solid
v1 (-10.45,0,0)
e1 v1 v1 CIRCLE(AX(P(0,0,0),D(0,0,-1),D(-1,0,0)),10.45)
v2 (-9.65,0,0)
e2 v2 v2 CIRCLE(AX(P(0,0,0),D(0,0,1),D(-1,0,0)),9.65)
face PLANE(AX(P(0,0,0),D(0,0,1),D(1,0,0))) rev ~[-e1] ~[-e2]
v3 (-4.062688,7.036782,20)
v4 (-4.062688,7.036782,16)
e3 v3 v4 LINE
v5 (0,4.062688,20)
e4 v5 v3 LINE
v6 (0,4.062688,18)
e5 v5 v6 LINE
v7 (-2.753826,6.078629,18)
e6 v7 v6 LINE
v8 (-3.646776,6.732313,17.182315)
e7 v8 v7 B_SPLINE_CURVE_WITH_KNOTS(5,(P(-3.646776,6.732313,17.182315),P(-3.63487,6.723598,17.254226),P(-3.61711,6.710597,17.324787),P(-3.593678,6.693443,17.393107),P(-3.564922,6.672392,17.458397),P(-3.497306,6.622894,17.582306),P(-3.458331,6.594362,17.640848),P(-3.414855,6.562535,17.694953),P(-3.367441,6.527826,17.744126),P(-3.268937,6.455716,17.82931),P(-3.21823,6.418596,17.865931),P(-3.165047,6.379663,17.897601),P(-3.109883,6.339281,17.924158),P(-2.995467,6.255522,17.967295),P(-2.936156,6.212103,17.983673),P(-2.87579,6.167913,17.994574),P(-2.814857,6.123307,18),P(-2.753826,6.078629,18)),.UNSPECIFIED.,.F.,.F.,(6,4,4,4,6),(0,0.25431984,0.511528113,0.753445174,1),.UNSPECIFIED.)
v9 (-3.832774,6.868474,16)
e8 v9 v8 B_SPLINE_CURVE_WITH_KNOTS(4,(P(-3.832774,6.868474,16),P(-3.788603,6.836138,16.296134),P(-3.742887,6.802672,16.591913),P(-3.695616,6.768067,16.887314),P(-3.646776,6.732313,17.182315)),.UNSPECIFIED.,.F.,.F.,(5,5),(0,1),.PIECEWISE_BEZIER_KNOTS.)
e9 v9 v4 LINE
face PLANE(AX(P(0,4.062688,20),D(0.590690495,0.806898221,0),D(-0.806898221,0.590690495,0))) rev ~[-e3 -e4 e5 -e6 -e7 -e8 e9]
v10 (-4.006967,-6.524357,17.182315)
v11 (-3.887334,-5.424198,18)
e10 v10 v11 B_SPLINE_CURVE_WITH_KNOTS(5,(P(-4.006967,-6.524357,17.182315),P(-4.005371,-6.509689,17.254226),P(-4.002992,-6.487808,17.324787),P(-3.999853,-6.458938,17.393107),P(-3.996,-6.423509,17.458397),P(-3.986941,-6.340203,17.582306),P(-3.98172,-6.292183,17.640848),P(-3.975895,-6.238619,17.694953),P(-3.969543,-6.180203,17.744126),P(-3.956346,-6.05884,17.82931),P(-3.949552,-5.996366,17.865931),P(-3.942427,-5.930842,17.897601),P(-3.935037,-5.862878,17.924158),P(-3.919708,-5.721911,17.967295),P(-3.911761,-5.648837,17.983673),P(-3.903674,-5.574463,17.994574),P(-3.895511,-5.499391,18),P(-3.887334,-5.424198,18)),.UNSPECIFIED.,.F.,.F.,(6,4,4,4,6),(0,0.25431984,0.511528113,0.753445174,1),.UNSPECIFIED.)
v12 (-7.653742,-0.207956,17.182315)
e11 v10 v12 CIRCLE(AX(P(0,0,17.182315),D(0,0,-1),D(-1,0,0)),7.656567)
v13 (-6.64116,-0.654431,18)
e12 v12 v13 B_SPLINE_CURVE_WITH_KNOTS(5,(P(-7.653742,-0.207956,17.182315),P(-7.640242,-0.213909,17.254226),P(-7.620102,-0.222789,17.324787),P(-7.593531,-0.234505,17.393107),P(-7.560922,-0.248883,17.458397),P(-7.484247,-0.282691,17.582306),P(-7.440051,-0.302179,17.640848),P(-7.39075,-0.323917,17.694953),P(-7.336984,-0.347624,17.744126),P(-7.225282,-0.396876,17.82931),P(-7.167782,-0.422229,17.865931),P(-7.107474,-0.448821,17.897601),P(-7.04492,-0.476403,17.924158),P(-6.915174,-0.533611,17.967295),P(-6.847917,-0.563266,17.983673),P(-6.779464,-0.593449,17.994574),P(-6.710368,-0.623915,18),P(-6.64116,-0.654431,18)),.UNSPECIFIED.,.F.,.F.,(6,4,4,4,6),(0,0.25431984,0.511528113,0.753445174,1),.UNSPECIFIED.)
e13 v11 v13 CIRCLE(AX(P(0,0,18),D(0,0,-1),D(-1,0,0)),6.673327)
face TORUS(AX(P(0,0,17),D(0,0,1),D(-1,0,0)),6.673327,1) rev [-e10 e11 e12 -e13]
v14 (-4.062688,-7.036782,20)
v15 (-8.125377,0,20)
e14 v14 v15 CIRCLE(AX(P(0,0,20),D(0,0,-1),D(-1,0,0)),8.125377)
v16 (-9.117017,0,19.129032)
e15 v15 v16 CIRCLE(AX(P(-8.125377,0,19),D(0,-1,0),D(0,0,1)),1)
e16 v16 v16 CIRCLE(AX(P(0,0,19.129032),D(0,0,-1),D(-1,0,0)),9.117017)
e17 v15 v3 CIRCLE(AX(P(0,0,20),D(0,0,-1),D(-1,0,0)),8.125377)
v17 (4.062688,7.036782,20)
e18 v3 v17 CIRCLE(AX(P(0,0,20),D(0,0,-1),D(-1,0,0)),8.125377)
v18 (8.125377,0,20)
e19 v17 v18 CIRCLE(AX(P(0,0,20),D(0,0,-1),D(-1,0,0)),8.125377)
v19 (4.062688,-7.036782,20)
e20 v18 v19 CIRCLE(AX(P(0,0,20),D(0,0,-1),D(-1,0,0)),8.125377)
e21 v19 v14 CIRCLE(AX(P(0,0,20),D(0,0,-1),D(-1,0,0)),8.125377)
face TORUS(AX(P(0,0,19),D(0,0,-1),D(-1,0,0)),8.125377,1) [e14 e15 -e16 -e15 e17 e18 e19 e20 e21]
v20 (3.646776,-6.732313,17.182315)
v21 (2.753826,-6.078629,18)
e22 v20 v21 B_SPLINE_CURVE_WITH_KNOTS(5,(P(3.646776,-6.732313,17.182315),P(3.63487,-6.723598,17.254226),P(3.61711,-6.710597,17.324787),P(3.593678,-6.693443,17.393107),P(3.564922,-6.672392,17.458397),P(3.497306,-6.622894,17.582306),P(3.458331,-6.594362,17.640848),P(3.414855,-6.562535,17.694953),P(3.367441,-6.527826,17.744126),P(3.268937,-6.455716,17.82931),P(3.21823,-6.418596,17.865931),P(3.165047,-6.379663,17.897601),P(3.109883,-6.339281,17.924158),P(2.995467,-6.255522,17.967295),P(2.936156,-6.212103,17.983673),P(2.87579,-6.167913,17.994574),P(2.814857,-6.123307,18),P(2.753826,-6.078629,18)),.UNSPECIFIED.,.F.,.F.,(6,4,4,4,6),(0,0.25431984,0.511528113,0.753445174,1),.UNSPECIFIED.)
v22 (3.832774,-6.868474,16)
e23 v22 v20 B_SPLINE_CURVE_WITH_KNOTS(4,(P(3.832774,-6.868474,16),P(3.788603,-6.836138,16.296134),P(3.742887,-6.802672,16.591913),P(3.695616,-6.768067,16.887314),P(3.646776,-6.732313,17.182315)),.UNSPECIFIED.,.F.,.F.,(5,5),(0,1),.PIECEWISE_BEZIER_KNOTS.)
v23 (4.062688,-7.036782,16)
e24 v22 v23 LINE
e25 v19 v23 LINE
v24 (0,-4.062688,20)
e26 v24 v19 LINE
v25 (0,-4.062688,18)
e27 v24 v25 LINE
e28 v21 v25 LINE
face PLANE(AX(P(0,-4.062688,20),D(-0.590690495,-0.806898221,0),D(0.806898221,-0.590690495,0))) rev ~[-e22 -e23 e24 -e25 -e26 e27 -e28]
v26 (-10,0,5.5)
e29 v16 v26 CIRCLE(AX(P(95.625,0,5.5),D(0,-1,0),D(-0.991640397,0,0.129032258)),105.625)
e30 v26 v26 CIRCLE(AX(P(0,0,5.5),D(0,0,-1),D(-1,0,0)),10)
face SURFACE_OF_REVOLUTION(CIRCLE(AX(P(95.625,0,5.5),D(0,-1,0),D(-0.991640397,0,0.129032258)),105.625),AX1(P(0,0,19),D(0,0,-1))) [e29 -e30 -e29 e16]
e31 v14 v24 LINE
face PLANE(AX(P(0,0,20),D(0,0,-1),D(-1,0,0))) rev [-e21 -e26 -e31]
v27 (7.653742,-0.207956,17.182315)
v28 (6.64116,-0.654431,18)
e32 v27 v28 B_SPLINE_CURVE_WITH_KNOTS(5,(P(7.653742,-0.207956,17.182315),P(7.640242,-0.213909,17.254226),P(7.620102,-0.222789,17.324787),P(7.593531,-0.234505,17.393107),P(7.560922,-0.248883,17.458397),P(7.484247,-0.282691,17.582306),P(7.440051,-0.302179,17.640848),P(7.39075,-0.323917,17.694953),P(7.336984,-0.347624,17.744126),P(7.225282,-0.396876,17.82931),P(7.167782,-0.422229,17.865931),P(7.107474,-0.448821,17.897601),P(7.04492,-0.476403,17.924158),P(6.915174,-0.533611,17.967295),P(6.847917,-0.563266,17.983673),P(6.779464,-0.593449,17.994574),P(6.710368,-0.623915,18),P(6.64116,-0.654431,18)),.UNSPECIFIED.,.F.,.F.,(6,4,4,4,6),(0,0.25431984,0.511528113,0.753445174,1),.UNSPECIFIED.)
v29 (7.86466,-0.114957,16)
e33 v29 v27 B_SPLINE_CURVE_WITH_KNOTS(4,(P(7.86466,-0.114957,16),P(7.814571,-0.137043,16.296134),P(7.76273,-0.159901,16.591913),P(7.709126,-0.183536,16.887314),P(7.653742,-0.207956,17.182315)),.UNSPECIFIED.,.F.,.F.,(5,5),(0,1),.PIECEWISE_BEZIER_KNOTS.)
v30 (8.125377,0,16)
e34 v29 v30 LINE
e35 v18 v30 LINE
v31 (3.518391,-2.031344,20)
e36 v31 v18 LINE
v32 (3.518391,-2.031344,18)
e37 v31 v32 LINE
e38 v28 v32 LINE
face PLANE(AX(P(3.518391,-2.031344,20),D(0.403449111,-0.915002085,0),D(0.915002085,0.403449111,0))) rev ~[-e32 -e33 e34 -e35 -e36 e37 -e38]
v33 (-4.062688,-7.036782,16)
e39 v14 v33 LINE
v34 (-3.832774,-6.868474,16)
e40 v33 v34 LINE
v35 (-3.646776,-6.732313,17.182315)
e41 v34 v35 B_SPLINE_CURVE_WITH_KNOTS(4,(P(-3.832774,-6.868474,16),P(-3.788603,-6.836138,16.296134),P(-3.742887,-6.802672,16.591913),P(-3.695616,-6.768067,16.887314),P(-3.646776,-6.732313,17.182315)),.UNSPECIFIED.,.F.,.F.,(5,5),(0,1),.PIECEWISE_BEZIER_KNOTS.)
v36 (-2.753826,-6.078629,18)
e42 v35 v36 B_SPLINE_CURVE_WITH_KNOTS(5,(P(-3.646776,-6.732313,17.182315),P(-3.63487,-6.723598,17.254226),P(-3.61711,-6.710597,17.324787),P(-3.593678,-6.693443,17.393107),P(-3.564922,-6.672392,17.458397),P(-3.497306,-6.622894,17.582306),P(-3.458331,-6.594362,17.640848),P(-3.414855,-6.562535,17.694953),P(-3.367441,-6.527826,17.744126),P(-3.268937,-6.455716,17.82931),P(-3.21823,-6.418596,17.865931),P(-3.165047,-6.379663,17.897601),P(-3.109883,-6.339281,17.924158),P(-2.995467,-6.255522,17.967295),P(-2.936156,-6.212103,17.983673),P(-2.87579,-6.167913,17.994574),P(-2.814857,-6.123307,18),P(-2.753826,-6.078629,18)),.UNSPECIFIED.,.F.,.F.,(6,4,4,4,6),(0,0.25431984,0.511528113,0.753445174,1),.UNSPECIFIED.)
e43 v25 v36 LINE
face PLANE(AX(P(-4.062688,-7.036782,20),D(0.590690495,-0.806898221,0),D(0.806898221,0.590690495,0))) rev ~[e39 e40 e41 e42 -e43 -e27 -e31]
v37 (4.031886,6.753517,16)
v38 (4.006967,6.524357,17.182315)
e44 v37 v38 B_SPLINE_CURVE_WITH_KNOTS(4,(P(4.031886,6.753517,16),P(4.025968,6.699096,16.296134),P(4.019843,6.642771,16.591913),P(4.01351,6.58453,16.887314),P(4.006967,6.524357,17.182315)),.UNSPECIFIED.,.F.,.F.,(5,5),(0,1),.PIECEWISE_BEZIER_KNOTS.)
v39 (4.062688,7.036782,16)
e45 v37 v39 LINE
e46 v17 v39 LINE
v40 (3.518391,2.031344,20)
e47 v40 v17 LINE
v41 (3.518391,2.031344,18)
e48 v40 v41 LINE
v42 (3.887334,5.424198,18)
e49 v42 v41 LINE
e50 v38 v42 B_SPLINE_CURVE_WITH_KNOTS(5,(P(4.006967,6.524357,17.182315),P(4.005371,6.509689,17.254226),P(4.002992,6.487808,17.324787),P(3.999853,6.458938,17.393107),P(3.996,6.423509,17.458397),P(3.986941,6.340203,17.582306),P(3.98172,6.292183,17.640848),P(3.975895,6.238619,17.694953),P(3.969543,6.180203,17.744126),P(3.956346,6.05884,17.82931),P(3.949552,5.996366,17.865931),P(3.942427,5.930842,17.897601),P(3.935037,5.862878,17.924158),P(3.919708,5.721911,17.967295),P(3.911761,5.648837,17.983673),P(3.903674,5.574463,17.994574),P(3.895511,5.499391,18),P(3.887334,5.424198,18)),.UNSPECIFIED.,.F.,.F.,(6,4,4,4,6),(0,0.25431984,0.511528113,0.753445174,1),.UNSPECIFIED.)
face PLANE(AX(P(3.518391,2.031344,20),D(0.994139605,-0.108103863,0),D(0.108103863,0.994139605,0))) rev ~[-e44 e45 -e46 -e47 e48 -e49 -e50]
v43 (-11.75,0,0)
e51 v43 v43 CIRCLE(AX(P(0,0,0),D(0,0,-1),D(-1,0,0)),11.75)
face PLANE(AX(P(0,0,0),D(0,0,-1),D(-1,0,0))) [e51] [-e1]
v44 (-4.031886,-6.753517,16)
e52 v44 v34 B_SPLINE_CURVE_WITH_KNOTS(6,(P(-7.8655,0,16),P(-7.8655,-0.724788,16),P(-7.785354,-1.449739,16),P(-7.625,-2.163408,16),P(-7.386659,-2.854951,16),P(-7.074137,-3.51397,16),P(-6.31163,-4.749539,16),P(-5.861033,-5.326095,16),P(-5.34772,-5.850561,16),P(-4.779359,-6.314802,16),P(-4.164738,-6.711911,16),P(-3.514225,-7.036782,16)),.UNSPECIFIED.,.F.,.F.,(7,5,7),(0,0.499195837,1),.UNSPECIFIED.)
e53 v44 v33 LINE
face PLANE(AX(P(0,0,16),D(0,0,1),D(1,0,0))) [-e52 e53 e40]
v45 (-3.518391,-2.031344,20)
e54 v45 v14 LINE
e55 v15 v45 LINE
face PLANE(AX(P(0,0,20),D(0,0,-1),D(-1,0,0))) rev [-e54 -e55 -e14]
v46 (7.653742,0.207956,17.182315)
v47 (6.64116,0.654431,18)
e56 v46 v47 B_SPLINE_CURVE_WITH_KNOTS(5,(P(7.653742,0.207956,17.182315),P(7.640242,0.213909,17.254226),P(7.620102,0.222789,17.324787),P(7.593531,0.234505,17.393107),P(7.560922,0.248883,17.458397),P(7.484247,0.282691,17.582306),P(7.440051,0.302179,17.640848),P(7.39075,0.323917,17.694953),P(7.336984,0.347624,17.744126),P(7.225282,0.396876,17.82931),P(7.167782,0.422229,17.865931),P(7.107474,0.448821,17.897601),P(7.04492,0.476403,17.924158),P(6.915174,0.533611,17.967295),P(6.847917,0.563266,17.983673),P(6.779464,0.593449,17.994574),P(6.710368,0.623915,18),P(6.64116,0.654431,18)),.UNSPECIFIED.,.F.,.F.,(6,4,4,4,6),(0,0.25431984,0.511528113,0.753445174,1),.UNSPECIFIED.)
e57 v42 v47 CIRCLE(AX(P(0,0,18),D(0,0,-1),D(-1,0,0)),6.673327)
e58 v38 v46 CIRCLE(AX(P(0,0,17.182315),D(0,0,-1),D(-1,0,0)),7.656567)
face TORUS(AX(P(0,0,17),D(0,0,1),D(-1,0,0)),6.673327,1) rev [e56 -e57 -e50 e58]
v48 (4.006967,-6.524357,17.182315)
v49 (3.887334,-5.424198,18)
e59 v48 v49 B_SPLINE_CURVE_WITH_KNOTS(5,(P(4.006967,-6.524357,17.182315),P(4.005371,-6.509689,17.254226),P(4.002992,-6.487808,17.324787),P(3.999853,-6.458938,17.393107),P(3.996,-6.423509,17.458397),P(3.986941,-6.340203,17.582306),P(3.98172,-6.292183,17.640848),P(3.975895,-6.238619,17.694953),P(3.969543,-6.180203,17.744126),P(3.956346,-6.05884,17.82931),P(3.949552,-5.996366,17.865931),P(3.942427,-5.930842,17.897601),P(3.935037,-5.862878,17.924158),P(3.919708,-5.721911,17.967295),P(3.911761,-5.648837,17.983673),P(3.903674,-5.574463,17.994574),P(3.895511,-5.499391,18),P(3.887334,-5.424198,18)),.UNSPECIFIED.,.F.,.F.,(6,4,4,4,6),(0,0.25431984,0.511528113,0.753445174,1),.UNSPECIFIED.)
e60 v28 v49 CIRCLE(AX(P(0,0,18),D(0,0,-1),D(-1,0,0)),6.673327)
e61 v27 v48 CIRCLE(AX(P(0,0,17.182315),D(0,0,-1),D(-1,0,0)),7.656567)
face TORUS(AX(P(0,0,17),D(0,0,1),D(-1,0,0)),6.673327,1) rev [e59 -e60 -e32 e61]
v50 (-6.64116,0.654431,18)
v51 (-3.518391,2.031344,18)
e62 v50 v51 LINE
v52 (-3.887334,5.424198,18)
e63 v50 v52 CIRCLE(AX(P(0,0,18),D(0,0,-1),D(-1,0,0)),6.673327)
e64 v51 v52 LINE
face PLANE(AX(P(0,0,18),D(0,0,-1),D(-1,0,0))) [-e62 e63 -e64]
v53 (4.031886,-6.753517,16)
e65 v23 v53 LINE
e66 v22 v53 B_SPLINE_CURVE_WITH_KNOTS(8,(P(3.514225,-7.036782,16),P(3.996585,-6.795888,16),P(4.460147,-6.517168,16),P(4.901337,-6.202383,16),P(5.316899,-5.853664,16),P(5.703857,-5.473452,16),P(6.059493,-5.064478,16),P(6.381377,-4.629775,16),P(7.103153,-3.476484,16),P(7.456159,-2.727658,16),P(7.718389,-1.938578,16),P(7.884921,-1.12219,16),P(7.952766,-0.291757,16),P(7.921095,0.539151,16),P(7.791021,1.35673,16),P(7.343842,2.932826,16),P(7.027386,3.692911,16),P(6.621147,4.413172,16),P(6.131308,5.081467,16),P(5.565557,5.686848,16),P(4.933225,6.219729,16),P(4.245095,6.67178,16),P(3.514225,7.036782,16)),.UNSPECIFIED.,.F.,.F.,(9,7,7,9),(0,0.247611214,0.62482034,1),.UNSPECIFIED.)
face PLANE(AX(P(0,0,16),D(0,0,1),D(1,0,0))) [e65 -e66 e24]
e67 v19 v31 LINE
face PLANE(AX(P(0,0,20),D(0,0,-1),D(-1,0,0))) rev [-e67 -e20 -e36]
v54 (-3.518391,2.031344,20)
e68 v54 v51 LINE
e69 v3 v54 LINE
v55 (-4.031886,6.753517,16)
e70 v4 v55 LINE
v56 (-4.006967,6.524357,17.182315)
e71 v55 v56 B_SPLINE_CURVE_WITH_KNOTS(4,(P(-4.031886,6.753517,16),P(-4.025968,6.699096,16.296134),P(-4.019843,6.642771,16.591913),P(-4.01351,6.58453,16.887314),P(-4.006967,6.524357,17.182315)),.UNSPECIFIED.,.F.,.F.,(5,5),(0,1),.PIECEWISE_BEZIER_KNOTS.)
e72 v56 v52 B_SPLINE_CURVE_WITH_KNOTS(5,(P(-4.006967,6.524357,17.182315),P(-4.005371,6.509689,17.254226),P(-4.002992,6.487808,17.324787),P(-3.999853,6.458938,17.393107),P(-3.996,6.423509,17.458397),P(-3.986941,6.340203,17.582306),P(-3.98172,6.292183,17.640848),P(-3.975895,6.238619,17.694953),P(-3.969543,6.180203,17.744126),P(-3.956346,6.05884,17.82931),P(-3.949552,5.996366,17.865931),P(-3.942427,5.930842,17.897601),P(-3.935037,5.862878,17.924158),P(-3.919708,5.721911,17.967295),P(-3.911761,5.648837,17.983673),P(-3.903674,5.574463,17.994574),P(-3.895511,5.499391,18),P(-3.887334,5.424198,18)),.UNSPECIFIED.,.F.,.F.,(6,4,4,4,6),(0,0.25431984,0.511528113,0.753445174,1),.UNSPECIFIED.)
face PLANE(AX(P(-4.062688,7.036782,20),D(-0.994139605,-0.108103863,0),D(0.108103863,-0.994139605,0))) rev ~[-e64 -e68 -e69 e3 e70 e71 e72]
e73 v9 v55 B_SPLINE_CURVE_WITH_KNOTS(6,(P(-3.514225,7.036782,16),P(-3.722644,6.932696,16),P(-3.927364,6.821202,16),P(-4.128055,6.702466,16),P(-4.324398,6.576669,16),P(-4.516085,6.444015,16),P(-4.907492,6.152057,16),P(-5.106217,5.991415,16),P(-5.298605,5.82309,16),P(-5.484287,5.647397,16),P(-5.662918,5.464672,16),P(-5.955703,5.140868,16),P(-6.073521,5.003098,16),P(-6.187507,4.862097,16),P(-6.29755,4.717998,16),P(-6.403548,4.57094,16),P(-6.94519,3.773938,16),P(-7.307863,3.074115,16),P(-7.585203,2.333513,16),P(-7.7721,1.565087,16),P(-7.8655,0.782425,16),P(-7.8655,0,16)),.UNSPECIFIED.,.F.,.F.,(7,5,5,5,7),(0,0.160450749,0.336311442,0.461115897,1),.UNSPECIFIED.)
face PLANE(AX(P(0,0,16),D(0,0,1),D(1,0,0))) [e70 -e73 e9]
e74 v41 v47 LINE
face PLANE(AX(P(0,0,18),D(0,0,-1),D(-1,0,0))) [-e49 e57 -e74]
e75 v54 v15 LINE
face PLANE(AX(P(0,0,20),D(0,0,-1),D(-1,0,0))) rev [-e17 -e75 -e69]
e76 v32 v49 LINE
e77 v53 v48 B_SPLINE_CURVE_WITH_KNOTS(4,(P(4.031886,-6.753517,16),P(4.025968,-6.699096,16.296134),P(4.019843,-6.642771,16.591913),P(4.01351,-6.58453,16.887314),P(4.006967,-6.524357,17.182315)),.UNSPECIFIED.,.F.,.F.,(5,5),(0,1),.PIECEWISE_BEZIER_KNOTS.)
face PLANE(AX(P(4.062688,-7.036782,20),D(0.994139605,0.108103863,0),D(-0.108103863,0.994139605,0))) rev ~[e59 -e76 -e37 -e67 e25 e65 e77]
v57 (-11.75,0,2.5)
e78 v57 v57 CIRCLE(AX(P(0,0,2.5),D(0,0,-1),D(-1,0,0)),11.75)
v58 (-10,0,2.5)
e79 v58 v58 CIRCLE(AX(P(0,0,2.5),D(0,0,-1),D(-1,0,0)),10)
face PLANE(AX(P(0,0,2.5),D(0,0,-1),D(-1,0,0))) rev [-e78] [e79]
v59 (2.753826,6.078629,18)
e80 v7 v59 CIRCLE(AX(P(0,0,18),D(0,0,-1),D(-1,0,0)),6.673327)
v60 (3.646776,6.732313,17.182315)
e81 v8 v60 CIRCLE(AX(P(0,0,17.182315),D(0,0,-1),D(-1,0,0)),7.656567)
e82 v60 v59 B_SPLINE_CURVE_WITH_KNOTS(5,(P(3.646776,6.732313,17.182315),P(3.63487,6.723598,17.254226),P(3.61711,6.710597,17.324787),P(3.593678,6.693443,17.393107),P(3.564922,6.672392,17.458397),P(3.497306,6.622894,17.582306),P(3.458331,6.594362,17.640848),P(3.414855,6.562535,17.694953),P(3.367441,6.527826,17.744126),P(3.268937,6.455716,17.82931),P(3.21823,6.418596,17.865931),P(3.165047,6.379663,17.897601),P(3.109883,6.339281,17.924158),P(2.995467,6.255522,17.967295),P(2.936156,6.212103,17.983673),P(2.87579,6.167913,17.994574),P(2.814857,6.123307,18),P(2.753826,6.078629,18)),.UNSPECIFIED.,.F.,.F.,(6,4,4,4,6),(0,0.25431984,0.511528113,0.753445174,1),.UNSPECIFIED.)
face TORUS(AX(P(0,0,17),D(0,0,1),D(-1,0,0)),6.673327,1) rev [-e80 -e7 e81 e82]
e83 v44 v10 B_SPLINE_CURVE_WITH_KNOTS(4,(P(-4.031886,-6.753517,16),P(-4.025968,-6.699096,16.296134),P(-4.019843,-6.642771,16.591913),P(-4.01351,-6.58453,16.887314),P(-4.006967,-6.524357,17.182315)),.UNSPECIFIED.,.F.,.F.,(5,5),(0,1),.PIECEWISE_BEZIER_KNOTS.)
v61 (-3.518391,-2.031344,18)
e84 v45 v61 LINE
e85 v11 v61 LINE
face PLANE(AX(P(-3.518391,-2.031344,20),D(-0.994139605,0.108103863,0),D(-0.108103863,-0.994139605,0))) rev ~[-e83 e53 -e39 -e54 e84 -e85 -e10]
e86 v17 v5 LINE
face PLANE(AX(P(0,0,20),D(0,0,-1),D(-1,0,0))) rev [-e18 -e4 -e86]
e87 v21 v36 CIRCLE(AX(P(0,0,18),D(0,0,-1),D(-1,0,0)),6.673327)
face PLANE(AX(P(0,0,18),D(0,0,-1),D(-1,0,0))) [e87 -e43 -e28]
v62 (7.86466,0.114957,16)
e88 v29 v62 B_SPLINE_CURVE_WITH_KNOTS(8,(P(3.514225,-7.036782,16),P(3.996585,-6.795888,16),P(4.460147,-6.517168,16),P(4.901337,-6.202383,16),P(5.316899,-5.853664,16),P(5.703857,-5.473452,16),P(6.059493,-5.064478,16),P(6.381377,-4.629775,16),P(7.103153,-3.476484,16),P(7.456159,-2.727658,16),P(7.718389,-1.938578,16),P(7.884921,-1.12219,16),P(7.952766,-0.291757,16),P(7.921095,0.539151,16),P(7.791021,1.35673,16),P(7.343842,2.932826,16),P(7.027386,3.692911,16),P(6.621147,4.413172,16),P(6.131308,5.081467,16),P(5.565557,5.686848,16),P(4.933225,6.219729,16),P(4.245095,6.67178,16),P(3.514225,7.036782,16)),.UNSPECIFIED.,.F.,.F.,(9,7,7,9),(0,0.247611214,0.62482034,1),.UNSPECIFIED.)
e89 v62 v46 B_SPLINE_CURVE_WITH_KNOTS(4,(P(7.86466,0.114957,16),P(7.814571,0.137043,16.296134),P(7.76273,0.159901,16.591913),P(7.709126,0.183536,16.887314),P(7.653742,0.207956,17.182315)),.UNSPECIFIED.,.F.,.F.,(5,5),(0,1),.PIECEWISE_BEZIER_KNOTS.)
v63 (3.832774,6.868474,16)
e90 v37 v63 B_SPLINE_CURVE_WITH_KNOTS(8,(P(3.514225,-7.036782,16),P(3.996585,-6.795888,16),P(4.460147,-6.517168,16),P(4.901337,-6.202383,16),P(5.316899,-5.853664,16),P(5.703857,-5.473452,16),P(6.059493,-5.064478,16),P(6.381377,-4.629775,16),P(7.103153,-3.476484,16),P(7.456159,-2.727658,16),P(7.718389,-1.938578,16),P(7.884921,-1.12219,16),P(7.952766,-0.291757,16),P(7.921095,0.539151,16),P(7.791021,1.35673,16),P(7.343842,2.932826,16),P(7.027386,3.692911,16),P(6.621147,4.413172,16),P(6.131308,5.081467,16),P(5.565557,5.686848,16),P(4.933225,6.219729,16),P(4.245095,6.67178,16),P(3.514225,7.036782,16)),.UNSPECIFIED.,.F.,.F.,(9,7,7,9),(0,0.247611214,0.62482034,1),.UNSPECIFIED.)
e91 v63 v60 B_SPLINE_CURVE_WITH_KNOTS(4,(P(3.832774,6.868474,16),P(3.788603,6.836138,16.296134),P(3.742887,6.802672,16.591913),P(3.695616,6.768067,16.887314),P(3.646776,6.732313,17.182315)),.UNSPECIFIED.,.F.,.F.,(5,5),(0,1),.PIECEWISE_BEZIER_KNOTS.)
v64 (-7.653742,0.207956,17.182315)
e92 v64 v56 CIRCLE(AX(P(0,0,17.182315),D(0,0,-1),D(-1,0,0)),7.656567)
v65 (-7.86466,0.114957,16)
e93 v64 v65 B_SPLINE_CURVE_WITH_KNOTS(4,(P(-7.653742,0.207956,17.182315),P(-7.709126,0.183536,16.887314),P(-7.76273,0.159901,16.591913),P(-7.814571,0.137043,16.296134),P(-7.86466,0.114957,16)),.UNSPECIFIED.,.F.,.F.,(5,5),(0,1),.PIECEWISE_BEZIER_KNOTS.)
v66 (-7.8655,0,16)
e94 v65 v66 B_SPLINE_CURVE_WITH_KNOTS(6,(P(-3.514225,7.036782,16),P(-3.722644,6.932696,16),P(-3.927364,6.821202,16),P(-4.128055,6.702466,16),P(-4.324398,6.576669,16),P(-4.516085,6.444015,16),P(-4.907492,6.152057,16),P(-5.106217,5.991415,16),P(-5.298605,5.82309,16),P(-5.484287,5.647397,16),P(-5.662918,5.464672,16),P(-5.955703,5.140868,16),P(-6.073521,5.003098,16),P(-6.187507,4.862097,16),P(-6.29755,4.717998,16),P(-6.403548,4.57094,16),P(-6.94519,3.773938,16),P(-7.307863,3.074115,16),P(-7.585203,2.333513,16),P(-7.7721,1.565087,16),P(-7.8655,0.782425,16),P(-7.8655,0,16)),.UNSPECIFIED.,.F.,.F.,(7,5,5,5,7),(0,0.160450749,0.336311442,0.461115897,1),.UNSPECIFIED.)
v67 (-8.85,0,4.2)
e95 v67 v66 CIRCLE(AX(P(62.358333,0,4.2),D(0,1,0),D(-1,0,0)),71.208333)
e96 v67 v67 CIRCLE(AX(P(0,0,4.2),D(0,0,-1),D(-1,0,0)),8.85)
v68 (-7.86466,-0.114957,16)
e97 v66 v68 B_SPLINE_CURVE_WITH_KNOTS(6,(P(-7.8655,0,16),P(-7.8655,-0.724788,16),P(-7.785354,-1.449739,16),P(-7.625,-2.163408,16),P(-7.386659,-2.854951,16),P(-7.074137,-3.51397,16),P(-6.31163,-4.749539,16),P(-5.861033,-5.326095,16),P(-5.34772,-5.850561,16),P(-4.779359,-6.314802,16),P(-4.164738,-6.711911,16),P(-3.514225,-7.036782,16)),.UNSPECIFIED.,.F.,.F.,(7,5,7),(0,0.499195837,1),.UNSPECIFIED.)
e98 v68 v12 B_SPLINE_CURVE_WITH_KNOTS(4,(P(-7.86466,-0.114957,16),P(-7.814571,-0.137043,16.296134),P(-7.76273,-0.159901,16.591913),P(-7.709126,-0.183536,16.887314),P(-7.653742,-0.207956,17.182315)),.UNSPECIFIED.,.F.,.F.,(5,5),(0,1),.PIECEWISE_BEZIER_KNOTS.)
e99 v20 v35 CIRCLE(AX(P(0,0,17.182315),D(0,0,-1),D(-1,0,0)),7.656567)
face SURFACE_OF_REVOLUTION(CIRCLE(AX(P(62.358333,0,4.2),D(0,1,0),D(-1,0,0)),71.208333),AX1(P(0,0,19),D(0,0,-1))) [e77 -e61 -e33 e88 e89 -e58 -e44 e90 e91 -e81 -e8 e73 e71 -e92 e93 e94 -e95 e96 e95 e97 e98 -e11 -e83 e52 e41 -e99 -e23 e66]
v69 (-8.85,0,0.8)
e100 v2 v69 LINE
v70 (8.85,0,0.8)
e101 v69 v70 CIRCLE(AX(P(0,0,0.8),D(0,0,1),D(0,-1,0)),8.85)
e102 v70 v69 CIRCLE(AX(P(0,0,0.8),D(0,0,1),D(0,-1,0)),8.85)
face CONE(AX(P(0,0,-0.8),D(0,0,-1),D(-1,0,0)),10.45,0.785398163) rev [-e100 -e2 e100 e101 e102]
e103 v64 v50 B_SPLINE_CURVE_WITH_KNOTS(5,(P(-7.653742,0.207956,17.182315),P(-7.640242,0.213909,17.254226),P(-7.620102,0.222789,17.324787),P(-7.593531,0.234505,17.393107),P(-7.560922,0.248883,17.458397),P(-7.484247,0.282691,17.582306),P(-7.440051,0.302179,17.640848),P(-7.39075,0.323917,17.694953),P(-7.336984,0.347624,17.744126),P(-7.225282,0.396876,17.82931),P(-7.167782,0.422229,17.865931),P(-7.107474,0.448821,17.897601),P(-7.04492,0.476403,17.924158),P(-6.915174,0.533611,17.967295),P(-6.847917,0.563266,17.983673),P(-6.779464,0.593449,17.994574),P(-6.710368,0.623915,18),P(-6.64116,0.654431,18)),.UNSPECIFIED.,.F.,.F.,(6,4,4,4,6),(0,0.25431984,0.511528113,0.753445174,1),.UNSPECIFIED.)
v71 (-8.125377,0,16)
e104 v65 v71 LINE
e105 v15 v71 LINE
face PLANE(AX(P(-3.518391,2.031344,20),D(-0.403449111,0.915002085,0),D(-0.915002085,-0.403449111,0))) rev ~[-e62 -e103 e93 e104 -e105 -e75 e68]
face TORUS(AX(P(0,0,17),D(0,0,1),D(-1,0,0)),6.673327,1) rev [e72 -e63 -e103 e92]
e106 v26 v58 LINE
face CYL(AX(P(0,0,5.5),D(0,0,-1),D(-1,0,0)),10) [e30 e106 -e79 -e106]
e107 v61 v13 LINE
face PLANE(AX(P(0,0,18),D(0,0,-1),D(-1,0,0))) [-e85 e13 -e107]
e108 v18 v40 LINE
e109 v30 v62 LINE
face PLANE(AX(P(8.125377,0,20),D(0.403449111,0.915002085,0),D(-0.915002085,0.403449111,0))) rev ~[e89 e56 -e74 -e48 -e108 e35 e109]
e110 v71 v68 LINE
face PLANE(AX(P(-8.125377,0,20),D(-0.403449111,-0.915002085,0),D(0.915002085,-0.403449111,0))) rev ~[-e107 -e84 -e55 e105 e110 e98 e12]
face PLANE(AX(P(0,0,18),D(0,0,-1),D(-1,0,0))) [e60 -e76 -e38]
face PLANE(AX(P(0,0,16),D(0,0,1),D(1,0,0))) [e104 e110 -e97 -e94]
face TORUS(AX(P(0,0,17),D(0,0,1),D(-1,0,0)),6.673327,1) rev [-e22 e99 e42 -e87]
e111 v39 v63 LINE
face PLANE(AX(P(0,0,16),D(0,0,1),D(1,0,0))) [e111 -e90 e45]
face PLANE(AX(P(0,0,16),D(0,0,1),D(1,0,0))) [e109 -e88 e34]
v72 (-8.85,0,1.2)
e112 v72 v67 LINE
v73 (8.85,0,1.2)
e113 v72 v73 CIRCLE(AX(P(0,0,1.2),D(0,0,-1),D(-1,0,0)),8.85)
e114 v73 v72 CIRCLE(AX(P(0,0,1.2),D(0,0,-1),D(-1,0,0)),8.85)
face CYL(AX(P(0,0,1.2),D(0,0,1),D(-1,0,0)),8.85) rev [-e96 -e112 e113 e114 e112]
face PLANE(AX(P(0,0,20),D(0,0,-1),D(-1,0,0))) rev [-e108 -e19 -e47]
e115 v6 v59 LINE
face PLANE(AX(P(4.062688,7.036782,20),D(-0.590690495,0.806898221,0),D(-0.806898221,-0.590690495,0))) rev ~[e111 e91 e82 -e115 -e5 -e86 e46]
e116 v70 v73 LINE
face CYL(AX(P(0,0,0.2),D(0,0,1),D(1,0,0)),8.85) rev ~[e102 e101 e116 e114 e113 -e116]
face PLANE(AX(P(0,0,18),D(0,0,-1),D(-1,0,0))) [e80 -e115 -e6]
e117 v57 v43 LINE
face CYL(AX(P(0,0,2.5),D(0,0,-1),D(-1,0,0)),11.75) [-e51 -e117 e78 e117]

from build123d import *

# Parameters (mm, degrees)
F3_DEPTH    = 4
F4_S6_R     = 8.85
F4_T7_DEPTH = 16


# Not quite as in the source:
# - a fillet or chamfer that OpenCascade refuses, or shapes differently, is made with other operations: its cross-section is extruded or revolved along the edge and cut away or added


with BuildPart() as f1:
    # F0 (on Front) → F1 (revolve)
    with BuildSketch(Plane.XZ):
        with BuildLine():
            Line((-11.75, 2.5), (-11.75, 0))
            Line((-11.75, 0), (-10.45, 0))
            Line((-10.45, 0), (-10.45, 1.2))
            Line((-10.45, 1.2), (-8.85, 1.2))
            Line((-8.85, 1.2), (-8.85, 4.2))
            ThreePointArc((-8.85, 4.2), (-8.5510140246, 10.7185269337), (-7.6565668329, 17.1823145401))
            ThreePointArc((-7.6565668329, 17.1823145401), (-7.3127346822, 17.7688675244), (-6.6733265732, 18))
            Line((-6.6733265732, 18), (0, 18))
            Line((0, 18), (0, 20))
            Line((0, 20), (-8.1253765053, 20))
            ThreePointArc((-8.1253765053, 20), (-8.7852885229, 19.7513428838), (-9.117016902, 19.1290322581))
            ThreePointArc((-9.117016902, 19.1290322581), (-9.7790230738, 12.3288025935), (-10, 5.5))
            Line((-10, 5.5), (-10, 2.5))
            Line((-10, 2.5), (-11.75, 2.5))
        make_face()
    revolve(axis=Axis((0, 0, 19), (0, 0, -1)))

    # F2 (on face) → F3 (cut)
    with BuildSketch(Plane.XY.offset(20)):
        Polygon((4.0626882527, 7.0367824689), (0, 4.0626882527), (-4.0626882527, 7.0367824689), (-3.5183912345, 2.0313441263), (-8.1253765053, 0), (-3.5183912345, -2.0313441263), (-4.0626882527, -7.0367824689), (0, -4.0626882527), (4.0626882527, -7.0367824689), (3.5183912345, -2.0313441263), (8.1253765053, 0), (3.5183912345, 2.0313441263), align=None)
    extrude(amount=-F3_DEPTH, mode=Mode.SUBTRACT)

    # F4: chamfer of 2 on 1 edges, made by hand


with BuildPart() as f4_tool2:
    # F4_s3 → F4_t4 (revolve)
    with BuildSketch(Plane.XZ):
        Polygon((-10.45, -0.8), (-8.45, 1.2), (-10.45, 1.2), align=None)
    revolve(axis=Axis((0, 0, 1.2), (0, 0, -1)))

    split(bisect_by=Plane.XY, keep=Keep.TOP)

    # F4_s6 → F4_t7 (cut, symmetric)
    with BuildSketch(Plane.XY.offset(0.2)):
        Circle(F4_S6_R)
    extrude(amount=F4_T7_DEPTH, both=True, mode=Mode.SUBTRACT)


with BuildPart() as f1_1:
    add(f1.part)

    # F4_t1: union F4_tool2
    add(f4_tool2.part)


solid = f1_1.part
